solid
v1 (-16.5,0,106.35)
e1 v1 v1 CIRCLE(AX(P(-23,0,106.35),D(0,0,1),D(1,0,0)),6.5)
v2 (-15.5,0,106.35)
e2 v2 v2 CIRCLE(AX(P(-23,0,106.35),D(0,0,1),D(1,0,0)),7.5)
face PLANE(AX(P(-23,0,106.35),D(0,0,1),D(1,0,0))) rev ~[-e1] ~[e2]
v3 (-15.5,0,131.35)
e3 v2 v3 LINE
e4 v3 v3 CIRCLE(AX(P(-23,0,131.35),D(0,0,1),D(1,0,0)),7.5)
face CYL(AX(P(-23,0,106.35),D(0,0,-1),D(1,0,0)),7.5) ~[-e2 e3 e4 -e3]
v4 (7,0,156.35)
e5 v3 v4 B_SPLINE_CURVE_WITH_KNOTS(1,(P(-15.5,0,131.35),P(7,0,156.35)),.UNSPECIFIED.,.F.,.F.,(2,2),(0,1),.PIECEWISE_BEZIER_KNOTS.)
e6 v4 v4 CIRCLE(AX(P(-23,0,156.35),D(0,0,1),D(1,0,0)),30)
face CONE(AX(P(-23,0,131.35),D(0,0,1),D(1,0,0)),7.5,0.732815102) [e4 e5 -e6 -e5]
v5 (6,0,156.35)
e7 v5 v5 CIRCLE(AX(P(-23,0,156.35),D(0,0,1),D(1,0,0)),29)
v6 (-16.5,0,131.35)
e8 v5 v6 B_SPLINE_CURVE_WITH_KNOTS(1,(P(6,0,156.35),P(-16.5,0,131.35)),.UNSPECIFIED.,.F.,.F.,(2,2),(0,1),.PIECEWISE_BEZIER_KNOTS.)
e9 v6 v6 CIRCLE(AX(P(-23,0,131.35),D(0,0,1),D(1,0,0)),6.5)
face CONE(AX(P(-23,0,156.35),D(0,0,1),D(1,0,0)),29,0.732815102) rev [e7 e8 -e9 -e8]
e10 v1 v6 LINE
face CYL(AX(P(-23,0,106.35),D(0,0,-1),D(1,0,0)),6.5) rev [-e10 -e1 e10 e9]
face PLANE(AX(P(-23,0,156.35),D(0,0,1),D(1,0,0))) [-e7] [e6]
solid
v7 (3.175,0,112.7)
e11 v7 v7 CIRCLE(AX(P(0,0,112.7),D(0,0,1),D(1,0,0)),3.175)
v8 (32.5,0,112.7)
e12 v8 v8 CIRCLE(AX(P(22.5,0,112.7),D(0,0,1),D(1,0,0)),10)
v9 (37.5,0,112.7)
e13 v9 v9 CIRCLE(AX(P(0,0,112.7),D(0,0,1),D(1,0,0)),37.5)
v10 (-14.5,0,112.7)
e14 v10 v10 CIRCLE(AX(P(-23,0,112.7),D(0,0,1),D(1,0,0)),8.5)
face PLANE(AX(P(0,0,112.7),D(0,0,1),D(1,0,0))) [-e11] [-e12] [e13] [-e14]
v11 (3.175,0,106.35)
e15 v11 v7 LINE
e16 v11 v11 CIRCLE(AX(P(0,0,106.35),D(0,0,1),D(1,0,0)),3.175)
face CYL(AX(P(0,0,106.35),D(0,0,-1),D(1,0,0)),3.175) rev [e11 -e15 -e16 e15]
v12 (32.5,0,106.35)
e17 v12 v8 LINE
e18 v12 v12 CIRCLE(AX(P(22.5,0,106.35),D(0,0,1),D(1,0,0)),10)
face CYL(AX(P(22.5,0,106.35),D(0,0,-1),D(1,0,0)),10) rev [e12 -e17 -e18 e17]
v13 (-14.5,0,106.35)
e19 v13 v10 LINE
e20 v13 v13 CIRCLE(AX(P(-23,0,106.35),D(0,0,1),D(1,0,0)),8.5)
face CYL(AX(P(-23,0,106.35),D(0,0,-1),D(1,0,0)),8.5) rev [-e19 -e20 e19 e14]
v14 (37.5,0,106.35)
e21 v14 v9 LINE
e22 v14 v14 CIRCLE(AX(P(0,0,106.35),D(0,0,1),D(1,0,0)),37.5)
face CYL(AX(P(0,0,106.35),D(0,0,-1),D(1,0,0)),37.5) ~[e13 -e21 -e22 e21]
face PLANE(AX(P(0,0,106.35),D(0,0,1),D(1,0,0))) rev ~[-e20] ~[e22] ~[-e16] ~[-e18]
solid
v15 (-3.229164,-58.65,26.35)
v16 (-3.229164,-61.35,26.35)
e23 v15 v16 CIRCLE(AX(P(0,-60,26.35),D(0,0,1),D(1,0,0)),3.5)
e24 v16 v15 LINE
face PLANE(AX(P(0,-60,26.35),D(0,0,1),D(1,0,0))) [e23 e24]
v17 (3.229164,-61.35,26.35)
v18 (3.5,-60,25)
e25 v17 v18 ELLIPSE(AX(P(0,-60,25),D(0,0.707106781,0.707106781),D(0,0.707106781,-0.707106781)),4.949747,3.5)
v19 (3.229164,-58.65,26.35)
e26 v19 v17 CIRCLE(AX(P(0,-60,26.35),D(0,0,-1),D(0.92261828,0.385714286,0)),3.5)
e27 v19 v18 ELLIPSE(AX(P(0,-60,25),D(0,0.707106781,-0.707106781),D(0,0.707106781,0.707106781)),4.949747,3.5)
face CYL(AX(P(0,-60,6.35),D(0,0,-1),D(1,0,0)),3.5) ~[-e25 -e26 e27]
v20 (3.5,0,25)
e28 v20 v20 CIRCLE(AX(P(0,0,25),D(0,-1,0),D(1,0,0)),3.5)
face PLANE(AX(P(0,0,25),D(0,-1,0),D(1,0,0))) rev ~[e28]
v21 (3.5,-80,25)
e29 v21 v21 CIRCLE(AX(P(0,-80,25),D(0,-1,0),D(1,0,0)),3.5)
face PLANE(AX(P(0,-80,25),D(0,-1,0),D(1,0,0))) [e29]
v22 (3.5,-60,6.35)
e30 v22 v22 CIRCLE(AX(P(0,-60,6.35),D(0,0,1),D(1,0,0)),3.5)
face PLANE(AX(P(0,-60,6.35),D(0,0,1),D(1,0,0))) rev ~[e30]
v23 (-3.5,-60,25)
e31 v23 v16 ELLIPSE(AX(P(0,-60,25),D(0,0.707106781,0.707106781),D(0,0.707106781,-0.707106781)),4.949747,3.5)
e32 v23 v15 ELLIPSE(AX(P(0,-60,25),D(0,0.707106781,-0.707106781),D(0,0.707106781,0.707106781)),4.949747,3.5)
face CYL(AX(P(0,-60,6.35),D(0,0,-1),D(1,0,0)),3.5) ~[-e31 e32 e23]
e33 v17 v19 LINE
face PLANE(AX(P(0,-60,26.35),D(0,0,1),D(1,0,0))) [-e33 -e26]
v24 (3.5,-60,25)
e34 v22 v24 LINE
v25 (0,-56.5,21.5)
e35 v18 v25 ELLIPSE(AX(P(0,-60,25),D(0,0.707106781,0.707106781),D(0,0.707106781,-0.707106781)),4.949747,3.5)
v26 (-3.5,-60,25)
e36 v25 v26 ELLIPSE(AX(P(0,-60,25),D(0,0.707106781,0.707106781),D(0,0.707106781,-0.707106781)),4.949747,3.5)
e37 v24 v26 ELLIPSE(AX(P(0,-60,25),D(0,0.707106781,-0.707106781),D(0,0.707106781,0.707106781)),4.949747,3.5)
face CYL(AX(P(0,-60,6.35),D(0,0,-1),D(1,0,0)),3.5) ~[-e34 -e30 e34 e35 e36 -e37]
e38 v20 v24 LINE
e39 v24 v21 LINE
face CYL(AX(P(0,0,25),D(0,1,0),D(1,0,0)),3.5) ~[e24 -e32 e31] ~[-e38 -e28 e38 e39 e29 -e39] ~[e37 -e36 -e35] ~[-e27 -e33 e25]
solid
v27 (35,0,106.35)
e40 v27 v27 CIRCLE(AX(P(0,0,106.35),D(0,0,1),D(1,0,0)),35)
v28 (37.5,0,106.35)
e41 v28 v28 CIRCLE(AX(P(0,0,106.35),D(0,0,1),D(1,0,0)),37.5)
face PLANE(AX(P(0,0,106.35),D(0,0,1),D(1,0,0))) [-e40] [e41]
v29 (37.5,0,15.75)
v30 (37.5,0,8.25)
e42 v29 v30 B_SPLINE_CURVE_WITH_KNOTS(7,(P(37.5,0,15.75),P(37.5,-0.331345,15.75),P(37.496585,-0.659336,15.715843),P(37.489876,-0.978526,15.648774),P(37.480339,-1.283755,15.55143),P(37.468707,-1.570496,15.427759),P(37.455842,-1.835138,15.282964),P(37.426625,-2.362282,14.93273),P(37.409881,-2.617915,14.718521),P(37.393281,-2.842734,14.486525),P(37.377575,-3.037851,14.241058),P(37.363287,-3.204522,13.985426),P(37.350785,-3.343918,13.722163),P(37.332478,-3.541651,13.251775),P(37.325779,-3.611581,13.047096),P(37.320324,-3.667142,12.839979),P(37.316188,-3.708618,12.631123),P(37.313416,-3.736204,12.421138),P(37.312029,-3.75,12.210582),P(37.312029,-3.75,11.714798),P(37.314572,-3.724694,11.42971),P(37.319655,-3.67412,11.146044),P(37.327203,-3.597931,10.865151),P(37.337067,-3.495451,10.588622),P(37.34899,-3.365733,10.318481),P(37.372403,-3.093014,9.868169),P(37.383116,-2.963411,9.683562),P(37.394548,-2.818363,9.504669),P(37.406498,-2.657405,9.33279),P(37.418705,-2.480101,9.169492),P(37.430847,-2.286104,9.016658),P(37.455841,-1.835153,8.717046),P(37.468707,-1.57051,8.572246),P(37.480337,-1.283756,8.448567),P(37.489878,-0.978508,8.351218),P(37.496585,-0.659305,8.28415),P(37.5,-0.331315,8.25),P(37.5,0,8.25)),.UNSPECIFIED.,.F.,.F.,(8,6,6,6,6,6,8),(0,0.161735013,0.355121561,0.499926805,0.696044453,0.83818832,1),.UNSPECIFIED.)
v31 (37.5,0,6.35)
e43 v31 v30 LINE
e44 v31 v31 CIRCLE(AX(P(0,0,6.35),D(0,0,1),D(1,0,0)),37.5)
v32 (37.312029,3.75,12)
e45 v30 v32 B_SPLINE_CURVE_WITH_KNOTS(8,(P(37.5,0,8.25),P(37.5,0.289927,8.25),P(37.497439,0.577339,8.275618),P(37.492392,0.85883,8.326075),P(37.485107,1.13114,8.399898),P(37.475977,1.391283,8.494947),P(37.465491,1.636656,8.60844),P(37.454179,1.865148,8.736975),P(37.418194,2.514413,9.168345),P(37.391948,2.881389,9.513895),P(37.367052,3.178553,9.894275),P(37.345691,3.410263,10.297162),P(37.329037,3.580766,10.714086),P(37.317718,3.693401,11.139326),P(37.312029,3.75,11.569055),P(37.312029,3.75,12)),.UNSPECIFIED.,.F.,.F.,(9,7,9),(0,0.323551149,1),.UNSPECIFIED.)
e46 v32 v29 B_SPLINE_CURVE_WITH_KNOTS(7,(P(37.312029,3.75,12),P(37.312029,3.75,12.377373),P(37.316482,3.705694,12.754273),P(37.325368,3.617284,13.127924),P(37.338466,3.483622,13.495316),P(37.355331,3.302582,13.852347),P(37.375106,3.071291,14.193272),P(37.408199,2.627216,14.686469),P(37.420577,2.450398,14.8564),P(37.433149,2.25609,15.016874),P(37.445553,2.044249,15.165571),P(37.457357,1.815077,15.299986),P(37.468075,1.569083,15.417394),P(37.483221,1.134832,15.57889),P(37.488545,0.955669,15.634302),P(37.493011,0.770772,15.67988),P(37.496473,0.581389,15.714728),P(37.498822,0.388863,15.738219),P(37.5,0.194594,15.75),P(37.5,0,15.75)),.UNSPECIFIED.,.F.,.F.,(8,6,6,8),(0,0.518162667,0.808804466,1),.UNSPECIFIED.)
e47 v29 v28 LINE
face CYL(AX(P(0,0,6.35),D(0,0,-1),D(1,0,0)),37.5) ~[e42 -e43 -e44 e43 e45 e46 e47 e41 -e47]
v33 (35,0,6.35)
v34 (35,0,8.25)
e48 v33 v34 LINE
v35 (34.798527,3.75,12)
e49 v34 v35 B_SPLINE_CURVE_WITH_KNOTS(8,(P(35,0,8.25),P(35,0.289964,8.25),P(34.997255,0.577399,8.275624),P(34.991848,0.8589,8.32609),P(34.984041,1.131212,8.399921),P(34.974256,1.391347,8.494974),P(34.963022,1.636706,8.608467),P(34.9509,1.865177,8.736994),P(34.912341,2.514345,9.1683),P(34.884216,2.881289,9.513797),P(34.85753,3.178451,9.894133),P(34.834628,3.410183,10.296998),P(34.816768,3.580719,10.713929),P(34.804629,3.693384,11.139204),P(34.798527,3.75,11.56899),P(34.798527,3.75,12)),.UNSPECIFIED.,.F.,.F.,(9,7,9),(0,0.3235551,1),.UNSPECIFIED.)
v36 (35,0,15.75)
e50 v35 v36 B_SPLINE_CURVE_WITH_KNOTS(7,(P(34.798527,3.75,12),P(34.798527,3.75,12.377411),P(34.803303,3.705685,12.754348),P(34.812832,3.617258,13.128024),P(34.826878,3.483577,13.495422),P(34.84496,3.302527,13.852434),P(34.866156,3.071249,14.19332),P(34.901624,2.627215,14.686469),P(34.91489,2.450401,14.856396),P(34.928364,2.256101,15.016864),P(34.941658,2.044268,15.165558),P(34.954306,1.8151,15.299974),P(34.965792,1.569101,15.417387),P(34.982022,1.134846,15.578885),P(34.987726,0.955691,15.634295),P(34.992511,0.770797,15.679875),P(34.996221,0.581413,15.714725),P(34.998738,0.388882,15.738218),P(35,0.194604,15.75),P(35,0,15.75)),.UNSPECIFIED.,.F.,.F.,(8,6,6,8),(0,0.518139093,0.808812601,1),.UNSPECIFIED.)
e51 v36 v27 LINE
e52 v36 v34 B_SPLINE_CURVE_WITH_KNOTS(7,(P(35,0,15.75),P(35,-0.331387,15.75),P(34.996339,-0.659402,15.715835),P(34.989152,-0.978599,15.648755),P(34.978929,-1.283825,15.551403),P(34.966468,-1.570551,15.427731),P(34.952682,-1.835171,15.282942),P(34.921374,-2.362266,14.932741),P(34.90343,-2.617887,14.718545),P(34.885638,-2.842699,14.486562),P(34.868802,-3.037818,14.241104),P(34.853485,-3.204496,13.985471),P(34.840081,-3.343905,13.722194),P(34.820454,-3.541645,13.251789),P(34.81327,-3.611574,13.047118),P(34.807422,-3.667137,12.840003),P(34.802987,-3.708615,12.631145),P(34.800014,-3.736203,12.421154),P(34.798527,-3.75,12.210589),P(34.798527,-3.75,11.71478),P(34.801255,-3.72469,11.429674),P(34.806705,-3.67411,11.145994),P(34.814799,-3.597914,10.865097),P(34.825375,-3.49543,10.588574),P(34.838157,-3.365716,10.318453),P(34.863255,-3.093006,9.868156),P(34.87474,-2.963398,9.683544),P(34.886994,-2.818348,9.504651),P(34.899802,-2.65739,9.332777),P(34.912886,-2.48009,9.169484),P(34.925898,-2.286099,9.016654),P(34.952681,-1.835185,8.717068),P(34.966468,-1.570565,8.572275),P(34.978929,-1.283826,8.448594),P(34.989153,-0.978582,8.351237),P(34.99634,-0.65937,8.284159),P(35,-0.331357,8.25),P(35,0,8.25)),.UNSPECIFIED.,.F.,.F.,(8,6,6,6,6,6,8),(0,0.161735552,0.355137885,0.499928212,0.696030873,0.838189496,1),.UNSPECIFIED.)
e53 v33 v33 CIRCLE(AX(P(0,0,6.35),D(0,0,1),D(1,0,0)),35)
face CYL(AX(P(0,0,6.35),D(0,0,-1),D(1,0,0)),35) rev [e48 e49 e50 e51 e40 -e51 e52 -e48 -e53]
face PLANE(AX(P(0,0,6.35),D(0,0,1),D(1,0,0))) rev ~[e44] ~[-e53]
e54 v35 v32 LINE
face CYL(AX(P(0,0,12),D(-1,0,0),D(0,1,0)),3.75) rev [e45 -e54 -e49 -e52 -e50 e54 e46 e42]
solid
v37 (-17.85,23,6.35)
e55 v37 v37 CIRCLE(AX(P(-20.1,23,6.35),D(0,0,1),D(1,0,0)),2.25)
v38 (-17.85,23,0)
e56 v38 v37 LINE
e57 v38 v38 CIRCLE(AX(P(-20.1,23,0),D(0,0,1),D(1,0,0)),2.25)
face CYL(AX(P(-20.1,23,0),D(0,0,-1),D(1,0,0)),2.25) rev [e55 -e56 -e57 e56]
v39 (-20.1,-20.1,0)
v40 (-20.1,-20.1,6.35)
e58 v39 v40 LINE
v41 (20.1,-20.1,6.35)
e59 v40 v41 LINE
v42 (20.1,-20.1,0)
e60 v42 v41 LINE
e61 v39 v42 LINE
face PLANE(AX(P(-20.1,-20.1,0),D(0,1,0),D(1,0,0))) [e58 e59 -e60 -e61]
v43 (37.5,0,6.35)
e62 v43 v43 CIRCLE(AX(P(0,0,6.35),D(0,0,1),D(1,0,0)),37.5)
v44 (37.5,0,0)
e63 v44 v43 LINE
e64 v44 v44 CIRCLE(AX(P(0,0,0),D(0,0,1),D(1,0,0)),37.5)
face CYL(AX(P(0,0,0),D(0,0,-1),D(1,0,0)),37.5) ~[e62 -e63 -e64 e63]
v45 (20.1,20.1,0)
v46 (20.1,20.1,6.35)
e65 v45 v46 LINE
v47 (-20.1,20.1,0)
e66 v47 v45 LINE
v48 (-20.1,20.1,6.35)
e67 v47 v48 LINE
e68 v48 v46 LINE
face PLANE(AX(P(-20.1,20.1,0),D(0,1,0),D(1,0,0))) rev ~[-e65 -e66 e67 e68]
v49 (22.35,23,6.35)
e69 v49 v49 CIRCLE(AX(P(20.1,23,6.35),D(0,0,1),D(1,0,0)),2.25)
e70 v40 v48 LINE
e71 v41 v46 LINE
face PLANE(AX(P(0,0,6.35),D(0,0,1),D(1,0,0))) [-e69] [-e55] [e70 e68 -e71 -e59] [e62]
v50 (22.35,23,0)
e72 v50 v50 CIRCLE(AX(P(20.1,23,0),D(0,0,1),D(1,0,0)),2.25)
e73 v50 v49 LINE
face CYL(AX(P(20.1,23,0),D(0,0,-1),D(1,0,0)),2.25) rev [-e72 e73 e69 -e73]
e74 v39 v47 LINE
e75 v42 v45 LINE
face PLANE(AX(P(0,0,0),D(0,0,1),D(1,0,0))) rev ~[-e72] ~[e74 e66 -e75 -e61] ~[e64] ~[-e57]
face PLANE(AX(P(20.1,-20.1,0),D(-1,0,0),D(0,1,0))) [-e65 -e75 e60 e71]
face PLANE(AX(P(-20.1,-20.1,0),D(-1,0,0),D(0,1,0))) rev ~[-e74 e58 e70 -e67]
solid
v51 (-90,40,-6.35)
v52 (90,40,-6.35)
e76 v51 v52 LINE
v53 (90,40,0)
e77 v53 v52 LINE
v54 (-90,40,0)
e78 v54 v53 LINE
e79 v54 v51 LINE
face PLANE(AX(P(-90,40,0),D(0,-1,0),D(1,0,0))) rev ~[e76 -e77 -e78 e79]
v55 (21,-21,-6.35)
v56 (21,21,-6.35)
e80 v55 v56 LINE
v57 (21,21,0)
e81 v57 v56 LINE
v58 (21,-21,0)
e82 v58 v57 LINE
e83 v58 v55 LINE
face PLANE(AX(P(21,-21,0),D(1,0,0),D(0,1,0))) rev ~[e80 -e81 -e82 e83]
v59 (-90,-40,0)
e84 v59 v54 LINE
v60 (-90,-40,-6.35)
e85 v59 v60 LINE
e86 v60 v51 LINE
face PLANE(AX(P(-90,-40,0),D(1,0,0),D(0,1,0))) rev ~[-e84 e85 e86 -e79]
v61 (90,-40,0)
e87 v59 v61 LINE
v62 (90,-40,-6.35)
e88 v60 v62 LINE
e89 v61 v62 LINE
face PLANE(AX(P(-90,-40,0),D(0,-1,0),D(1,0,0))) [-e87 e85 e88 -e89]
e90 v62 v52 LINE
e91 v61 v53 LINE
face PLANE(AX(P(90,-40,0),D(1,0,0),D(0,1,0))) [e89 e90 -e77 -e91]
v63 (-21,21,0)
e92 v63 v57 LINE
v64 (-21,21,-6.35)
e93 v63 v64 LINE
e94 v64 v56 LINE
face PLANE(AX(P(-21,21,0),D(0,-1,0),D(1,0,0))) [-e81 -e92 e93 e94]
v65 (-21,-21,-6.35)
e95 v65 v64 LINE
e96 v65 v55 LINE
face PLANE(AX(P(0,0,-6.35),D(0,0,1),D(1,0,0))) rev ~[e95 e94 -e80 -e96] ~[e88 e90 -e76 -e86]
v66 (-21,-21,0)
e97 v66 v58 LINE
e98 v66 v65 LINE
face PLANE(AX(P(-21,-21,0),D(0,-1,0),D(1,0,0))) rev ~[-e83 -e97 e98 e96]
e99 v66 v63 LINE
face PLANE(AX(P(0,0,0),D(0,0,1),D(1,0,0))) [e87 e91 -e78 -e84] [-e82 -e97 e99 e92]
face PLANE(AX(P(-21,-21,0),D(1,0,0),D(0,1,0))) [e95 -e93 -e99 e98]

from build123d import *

# Parameters (mm, degrees)
F0_R       = 37.5
F0_R_2     = 2.25
F0_W       = 40.2
F0_H       = 40.2
F1_DEPTH   = 6.35
F3_R       = 37.5
F3_R_2     = 35
F4_DEPTH   = 100
F6_R       = 37.5
F6_R_2     = 8.5
F6_R_3     = 3.175
F6_R_4     = 10
F7_DEPTH   = 6.35
F9_W       = 180
F9_H       = 80
F9_W_2     = 42
F9_H_2     = 42
F10_DEPTH  = 6.35
F13_R      = 3.75
F14_DEPTH  = 75
F15_R      = 3.5
F16_DEPTH  = 80
F17_R      = 3.5
F18_DEPTH  = 20
F21_R      = 7.5
F22_DEPTH  = 25
F22_FACE_R = 7.5
F23_R      = 30
F25_R      = 6.5
F26_DEPTH  = 25
F27_R      = 29
F29_R      = 6.5


# Not quite as in the source:
# - a feature of the source that left no trace in its solid (it failed there, or was rolled back) is left out


with BuildPart() as f1:
    # F0 (on Top) → F1 (new body)
    with BuildSketch(Plane.XY):
        Circle(F0_R)
        with Locations((-20.1, 23)):
            Circle(F0_R_2, mode=Mode.SUBTRACT)
        Rectangle(F0_W, F0_H, mode=Mode.SUBTRACT)
        with Locations((20.1, 23)):
            Circle(F0_R_2, mode=Mode.SUBTRACT)
    extrude(amount=F1_DEPTH)


with BuildPart() as f4:
    # F3 (on offset) → F4 (new body)
    with BuildSketch(Plane.XY.offset(6.35)):
        Circle(F3_R)
        Circle(F3_R_2, mode=Mode.SUBTRACT)
    extrude(amount=F4_DEPTH)

    # F13 (on Right) → F14 (cut)
    with BuildSketch(Plane.YZ):
        with Locations((0, 12)):
            Circle(F13_R)
    extrude(amount=F14_DEPTH, mode=Mode.SUBTRACT)


with BuildPart() as f7:
    # F6 (on offset) → F7 (new body)
    with BuildSketch(Plane.XY.offset(106.35)):
        Circle(F6_R)
        with Locations((-23, 0)):
            Circle(F6_R_2, mode=Mode.SUBTRACT)
        Circle(F6_R_3, mode=Mode.SUBTRACT)
        with Locations((22.5, 0)):
            Circle(F6_R_4, mode=Mode.SUBTRACT)
    extrude(amount=F7_DEPTH)


with BuildPart() as f10:
    # F9 (on Top) → F10 (new body)
    with BuildSketch(Plane.XY):
        Rectangle(F9_W, F9_H)
        Rectangle(F9_W_2, F9_H_2, mode=Mode.SUBTRACT)
    extrude(amount=-F10_DEPTH)


with BuildPart() as f16:
    # F15 (on Front) → F16 (new body)
    with BuildSketch(Plane.XZ):
        with Locations((0, 25)):
            Circle(F15_R)
    extrude(amount=F16_DEPTH)

    # F17 (on offset) → F18 (join)
    with BuildSketch(Plane.XY.offset(6.35)):
        with Locations((0, -60)):
            Circle(F17_R)
    extrude(amount=F18_DEPTH)


with BuildPart() as f22:
    # F21 (on offset) → F22 (new body)
    with BuildSketch(Plane.XY.offset(106.35)):
        with Locations((-23, 0)):
            Circle(F21_R)
    extrude(amount=F22_DEPTH)

    # F22_face (on face) → F24 section 0
    with BuildSketch(Plane(origin=(-23, 0, 131.35), x_dir=(1, 0, 0), z_dir=(0, 0, 1))):
        Circle(F22_FACE_R)
    # F23 (on offset) → F24 section 1
    with BuildSketch(Plane.XY.offset(156.35)):
        with Locations((-23, 0)):
            Circle(F23_R)
    loft()

    # F25 (on offset) → F26 (cut)
    with BuildSketch(Plane.XY.offset(106.35)):
        with Locations((-23, 0)):
            Circle(F25_R)
    extrude(amount=F26_DEPTH, mode=Mode.SUBTRACT)

    # F27 (on offset) → F30 section 0
    with BuildSketch(Plane.XY.offset(156.35)):
        with Locations((-23, 0)):
            Circle(F27_R)
    # F29 (on offset) → F30 section 1
    with BuildSketch(Plane.XY.offset(131.35)):
        with Locations((-23, 0)):
            Circle(F29_R)
    loft(mode=Mode.SUBTRACT)


solid = Compound([f1.part, f4.part, f7.part, f10.part, f16.part, f22.part])
